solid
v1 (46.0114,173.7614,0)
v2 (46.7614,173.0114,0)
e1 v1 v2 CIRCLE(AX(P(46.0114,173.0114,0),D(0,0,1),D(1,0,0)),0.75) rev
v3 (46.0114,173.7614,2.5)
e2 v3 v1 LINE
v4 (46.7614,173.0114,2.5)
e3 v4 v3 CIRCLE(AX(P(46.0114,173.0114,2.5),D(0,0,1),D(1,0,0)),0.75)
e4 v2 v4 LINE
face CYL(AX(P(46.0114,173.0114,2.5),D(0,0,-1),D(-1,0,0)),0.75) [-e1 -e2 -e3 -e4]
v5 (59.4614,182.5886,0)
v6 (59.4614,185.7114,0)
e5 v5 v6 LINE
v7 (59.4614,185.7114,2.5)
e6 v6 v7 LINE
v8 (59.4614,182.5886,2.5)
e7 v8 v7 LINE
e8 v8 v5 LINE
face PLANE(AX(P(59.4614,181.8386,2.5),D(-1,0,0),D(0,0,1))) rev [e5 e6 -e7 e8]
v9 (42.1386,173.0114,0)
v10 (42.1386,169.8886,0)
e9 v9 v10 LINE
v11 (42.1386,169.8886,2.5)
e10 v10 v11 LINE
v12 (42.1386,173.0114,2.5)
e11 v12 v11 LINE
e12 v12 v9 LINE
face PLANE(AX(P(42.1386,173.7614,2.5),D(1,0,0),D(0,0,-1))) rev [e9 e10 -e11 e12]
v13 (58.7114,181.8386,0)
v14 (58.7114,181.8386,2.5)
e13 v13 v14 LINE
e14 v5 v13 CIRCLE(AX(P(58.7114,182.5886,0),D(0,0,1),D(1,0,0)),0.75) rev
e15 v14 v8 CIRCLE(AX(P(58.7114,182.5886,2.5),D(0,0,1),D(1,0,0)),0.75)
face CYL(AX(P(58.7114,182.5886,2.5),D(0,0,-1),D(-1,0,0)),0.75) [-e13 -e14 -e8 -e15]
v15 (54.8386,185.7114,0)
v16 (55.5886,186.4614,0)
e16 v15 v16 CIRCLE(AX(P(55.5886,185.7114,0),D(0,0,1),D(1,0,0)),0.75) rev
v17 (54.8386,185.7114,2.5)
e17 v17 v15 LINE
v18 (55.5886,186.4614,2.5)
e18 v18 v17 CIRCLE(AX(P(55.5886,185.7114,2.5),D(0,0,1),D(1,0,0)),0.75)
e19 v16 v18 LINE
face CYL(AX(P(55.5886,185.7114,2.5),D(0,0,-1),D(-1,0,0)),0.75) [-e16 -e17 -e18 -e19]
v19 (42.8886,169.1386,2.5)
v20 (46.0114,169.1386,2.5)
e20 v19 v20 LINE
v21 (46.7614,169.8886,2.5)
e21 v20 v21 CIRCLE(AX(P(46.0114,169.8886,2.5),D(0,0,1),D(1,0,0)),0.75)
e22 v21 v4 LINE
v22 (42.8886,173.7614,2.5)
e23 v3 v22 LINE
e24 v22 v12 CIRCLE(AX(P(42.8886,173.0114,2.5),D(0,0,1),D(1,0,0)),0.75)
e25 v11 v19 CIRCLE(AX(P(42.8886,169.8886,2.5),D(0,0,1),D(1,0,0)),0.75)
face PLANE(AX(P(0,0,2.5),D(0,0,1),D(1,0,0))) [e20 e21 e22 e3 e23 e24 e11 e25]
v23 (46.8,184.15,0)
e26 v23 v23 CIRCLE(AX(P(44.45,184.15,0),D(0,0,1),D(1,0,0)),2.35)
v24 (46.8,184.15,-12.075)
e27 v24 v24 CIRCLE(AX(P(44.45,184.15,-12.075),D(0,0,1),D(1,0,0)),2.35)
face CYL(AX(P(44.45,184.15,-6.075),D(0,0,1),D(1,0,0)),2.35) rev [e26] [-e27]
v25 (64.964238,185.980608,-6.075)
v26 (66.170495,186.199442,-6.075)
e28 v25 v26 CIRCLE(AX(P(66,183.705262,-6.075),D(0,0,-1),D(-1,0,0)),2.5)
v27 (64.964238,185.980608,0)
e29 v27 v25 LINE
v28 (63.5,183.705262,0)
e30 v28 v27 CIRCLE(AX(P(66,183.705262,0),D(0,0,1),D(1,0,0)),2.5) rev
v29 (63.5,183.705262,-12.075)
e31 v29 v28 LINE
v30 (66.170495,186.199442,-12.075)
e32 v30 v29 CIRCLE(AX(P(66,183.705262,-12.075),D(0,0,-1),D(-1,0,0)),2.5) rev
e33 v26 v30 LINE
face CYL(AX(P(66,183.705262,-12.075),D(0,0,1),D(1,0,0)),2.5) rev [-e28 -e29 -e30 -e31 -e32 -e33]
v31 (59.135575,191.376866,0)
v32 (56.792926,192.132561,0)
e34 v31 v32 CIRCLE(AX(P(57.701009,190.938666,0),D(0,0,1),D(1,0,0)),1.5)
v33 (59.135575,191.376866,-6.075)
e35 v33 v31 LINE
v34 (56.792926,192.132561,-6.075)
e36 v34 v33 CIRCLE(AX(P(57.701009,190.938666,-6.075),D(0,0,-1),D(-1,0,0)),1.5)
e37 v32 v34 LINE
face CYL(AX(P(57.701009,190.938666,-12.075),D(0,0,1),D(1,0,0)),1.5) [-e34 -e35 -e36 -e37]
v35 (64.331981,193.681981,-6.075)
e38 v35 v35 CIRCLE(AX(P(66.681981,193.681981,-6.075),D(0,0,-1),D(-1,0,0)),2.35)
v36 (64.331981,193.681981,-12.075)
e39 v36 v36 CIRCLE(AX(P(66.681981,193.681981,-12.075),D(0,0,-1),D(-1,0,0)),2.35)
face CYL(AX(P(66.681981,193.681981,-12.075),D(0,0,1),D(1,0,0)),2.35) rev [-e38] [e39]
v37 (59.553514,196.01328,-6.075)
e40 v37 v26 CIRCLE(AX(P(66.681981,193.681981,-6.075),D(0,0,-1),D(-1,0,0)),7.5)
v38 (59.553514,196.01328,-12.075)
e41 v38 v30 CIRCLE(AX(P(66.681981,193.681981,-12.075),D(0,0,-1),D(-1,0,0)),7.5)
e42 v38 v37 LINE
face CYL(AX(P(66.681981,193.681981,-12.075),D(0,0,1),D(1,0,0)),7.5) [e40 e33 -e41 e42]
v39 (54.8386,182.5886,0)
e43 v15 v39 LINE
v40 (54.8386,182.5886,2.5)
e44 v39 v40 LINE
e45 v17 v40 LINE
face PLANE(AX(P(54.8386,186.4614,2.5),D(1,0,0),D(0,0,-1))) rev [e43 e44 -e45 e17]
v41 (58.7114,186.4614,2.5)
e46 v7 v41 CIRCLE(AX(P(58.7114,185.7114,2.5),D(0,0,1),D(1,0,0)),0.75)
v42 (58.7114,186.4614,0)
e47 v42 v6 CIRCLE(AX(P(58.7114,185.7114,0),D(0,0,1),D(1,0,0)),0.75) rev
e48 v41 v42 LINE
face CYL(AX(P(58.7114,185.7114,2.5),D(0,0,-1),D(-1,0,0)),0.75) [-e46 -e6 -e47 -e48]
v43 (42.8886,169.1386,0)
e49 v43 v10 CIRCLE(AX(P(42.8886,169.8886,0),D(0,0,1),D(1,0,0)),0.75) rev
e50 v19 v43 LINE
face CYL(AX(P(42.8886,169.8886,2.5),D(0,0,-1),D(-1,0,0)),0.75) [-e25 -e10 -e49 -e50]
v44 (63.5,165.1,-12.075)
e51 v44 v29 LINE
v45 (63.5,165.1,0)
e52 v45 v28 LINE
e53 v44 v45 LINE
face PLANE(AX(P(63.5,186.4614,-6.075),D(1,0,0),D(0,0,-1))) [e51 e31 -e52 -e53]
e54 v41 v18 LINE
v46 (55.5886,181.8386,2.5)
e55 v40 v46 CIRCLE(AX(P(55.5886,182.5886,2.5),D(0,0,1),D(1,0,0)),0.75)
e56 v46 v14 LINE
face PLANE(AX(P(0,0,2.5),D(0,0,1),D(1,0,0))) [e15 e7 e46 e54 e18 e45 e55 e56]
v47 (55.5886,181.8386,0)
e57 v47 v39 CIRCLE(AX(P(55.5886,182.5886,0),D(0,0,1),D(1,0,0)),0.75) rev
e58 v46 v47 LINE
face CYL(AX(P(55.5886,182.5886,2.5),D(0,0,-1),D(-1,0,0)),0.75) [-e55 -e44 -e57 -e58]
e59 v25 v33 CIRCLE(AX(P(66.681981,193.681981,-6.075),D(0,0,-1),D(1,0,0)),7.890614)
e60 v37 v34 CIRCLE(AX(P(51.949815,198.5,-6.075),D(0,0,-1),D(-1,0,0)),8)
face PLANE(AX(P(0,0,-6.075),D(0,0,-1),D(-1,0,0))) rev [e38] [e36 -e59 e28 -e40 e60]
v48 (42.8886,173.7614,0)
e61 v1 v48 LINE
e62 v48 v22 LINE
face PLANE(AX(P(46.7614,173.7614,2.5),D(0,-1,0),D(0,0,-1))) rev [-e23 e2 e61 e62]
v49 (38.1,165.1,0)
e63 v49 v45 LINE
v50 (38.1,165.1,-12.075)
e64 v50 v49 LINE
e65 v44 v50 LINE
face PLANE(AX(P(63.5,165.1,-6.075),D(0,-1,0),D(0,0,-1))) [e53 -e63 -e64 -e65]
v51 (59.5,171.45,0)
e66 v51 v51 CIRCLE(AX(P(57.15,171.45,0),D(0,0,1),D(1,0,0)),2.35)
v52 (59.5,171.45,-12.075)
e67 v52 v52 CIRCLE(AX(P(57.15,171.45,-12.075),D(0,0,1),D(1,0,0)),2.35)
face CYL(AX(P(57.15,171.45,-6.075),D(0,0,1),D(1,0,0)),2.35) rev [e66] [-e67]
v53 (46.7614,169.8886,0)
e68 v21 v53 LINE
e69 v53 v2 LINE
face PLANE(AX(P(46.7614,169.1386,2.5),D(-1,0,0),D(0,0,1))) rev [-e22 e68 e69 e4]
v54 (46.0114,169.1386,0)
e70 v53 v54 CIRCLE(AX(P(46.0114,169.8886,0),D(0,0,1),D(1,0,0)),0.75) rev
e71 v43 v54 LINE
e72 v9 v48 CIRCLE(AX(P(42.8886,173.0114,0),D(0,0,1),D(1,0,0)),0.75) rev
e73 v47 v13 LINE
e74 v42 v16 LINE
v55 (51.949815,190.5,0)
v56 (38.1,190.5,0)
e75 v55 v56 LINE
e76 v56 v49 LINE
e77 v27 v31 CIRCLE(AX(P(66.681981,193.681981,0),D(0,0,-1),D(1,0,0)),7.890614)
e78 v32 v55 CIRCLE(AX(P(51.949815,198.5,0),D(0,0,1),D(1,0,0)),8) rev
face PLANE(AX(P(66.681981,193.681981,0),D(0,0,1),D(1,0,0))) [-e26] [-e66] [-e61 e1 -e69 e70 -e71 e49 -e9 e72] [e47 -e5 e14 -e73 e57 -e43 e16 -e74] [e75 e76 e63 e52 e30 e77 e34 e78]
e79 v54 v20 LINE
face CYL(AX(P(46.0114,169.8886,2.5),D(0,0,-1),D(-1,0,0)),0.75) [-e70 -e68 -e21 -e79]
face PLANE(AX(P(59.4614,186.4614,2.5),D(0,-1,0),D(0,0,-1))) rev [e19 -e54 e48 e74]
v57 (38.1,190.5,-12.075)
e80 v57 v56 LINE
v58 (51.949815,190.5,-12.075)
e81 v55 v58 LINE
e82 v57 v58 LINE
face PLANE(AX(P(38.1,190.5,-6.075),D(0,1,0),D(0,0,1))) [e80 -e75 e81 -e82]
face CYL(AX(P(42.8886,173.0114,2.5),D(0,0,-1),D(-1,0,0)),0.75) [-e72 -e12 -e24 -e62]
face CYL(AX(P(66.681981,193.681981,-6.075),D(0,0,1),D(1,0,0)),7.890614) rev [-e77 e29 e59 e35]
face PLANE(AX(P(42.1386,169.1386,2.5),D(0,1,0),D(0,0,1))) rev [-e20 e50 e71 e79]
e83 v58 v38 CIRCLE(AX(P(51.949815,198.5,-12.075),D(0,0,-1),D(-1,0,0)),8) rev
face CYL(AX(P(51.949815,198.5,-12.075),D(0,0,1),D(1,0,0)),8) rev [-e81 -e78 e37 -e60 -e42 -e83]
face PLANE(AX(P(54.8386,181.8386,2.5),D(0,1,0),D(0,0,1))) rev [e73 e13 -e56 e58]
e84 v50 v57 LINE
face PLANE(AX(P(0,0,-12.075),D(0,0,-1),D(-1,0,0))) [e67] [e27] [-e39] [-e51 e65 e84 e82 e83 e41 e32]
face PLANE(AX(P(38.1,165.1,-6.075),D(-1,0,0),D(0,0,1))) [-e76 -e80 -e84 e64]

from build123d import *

# Parameters (mm, degrees)
SKETCH2_R             = 2.35
BOSS_EXTRUDE1_DEPTH   = 2.5
BOSS_EXTRUDE1_2_DEPTH = 2.5
SKETCH2_W             = 4.6228
SKETCH2_H             = 4.6228
BOSS_EXTRUDE1_3_DEPTH = 2.5
BOSS_EXTRUDE1_4_DEPTH = 2.5
BOSS_EXTRUDE2_DEPTH   = 6.075
SKETCH6_R             = 2.35
CUT_EXTRUDE1_DEPTH    = 201.98763799
SKETCH4_R             = 7.5
SKETCH4_R_2           = 2.35
BOSS_EXTRUDE4_DEPTH   = 6
FILLET2_R             = 2.5
FILLET3_R             = 8
SKETCH7_R             = 2.35
CUT_EXTRUDE2_DEPTH    = 215.594236042
FILLET4_R             = 1.5
FILLET5_R             = 0.75


with BuildPart() as part:
    # Sketch2 → Boss-Extrude1 (new body)
    with BuildSketch(Plane.XY):
        with Locations((44.45, 184.15)):
            Circle(SKETCH2_R)
    extrude(amount=BOSS_EXTRUDE1_DEPTH)


with BuildPart() as body_2:
    # Sketch2 → Boss-Extrude1 2 (new body)
    with BuildSketch(Plane.XY):
        with Locations((57.15, 171.45)):
            Circle(SKETCH2_R)
    extrude(amount=BOSS_EXTRUDE1_2_DEPTH)


with BuildPart() as body_3:
    # Sketch2 → Boss-Extrude1 3 (new body)
    with BuildSketch(Plane.XY):
        with Locations((57.15, 184.15)):
            Rectangle(SKETCH2_W, SKETCH2_H)
    extrude(amount=BOSS_EXTRUDE1_3_DEPTH)



with BuildPart() as body_4:
    # Sketch2 → Boss-Extrude1 4 (new body)
    with BuildSketch(Plane.XY):
        with Locations((44.45, 171.45)):
            Rectangle(SKETCH2_W, SKETCH2_H)
    extrude(amount=BOSS_EXTRUDE1_4_DEPTH)


with BuildPart() as body_3_1:
    add(body_3.part)

    add(body_4.part)  # Boss-Extrude2 merges body 4
    # Sketch3 → Boss-Extrude2 (add)
    with BuildSketch(Plane.XY):
        with BuildLine():
            Line((63.5, 186.4614), (63.5, 165.1))
            Line((63.5, 165.1), (38.1, 165.1))
            Line((38.1, 165.1), (38.1, 190.5))
            Line((38.1, 190.5), (59.4614, 190.5))
            ThreePointArc((59.4614, 190.5), (61.102474131, 188.102474131), (63.5, 186.4614))
        make_face()
    extrude(amount=-BOSS_EXTRUDE2_DEPTH)


with BuildPart() as cut_extrude1_tool:
    # Sketch6 → Cut-Extrude1 (new, through all)
    with BuildSketch(Plane.XY.offset(2.5)):
        with Locations((44.45, 184.15)):
            Circle(SKETCH6_R)
        with Locations((57.15, 171.45)):
            Circle(SKETCH6_R)
    extrude(amount=-CUT_EXTRUDE1_DEPTH)


with BuildPart() as part_1:
    add(part.part)

    # Cut-Extrude1: cut by cut_extrude1_tool
    add(cut_extrude1_tool.part, mode=Mode.SUBTRACT)


with BuildPart() as body_2_1:
    add(body_2.part)

    # Cut-Extrude1: cut by cut_extrude1_tool
    add(cut_extrude1_tool.part, mode=Mode.SUBTRACT)


with BuildPart() as body_3_2:
    add(body_3_1.part)

    # Cut-Extrude1: cut by cut_extrude1_tool
    add(cut_extrude1_tool.part, mode=Mode.SUBTRACT)

    # Sketch4 → Boss-Extrude4 (add)
    # profile 1 of 3: a face of its own
    with BuildSketch(Plane(origin=(0, 0, -6.075), x_dir=(-1, 0, 0), z_dir=(0, 0, -1))):
        with Locations((-66.681980515, 193.681980515)):
            Circle(SKETCH4_R)
        with Locations((-66.681980515, 193.681980515)):
            Circle(SKETCH4_R_2, mode=Mode.SUBTRACT)
    # profile 2 of 3: a face of its own
    with BuildSketch(Plane(origin=(0, 0, -6.075), x_dir=(-1, 0, 0), z_dir=(0, 0, -1))):
        with BuildLine():
            Line((-38.1, 190.5), (-59.4614, 190.5))
            ThreePointArc((-59.4614, 190.5), (-61.102474131, 188.102474131), (-63.5, 186.4614))
            Line((-63.5, 186.4614), (-63.5, 165.1))
            Line((-63.5, 165.1), (-38.1, 165.1))
            Line((-38.1, 165.1), (-38.1, 190.5))
        make_face()
    # profile 3 of 3: a face of its own
    with BuildSketch(Plane(origin=(0, 0, -6.075), x_dir=(-1, 0, 0), z_dir=(0, 0, -1))):
        with BuildLine():
            ThreePointArc((-63.5, 186.4614), (-61.102474131, 188.102474131), (-59.4614, 190.5))
            Line((-59.4614, 190.5), (-59.890441662, 190.5))
            ThreePointArc((-59.890441662, 190.5), (-61.378679656, 188.378679656), (-63.5, 186.890441662))
            Line((-63.5, 186.890441662), (-63.5, 186.4614))
        make_face()
    extrude(amount=BOSS_EXTRUDE4_DEPTH)

    # Fillet2
    fillet2_edges = [body_3_2.edges().sort_by_distance(p)[0] for p in [
        (63.5, 186.890441662, -9.075),
    ]]
    fillet(fillet2_edges, radius=FILLET2_R)

    # Fillet3
    # the kernel refuses this fillet: 8 mm, written as the material it adds along each edge
    with BuildSketch(Plane(origin=(59.890441662, 190.5, 13.776565592), x_dir=(-1, 0, 0), z_dir=(0, 0, -1))) as fillet3_piece_1_section:
        with BuildLine():
            CenterArc((7.940626237, 8), FILLET3_R, 198.10985807, 71.89014193)
            ThreePointArc((0.336928126, 5.513280266), (0.694495171, 2.724493268), (0, 0))
            Line((0, 0), (7.940626237, 0))
        make_face()
    fillet3_piece_1 = extrude(amount=25.851565592, mode=Mode.PRIVATE)
    fillet3_piece_1 = fillet3_piece_1 - Plane(origin=(66.681980515, 193.681980515, -3.0375), x_dir=(-0.9150847933660875, -0.40326147962599274, 0), z_dir=(0, 0, 1)) * Cylinder(7.8906136, 84, mode=Mode.PRIVATE)
    fillet3_piece_1 = split(fillet3_piece_1, bisect_by=Plane(origin=(57.125105601, 191.419685935, 0), z_dir=(0, 0, -1)), keep=Keep.TOP, mode=Mode.PRIVATE)
    fillet3_piece_1 = split(fillet3_piece_1, bisect_by=Plane(origin=(57.125105601, 191.419685935, -6.075), z_dir=(0, 0, 1)), keep=Keep.TOP, mode=Mode.PRIVATE)
    add(fillet3_piece_1)
    with BuildSketch(Plane(origin=(59.890441662, 190.5, -6.075), x_dir=(-1, 0, 0), z_dir=(0, 0, -1))) as fillet3_piece_2_section:
        with BuildLine():
            CenterArc((7.940626237, 8), FILLET3_R, 198.10985807, 71.89014193)
            ThreePointArc((0.336928126, 5.513280266), (0.694495171, 2.724493268), (0, 0))
            Line((0, 0), (7.940626237, 0))
        make_face()
    fillet3_piece_2 = extrude(amount=6, mode=Mode.PRIVATE)
    fillet3_piece_2 = fillet3_piece_2 - Plane(origin=(66.681980515, 193.681980515, -9.075), x_dir=(-0.9150847933660875, -0.40326147962599274, 0), z_dir=(0, 0, 1)) * Cylinder(7.8906136, 44, mode=Mode.PRIVATE)
    add(fillet3_piece_2)
    with BuildSketch(Plane(origin=(59.890441662, 190.5, -6.075), x_dir=(-1, 0, 0), z_dir=(0, 0, -1))) as fillet3_piece_3_section:
        with BuildLine():
            CenterArc((7.940626237, 8), FILLET3_R, 198.10985807, 71.89014193)
            ThreePointArc((0.336928126, 5.513280266), (0.694495171, 2.724493268), (0, 0))
            Line((0, 0), (7.940626237, 0))
        make_face()
    fillet3_piece_3 = extrude(amount=6, mode=Mode.PRIVATE)
    fillet3_piece_3 = fillet3_piece_3 & Plane(origin=(66.681980515, 193.681980515, -9.075), x_dir=(-0.9150847933660875, -0.40326147962599274, 0), z_dir=(0, 0, 1)) * Cylinder(7.8906136, 44, mode=Mode.PRIVATE)
    add(fillet3_piece_3)

    # Sketch7 → Cut-Extrude2 (cut, through all)
    with BuildSketch(Plane.XY.offset(-6.075)):
        with Locations((44.45, 184.15)):
            Circle(SKETCH7_R)
        with Locations((57.15, 171.45)):
            Circle(SKETCH7_R)
    extrude(amount=-CUT_EXTRUDE2_DEPTH, mode=Mode.SUBTRACT)

    # Fillet4
    fillet4_edges = [body_3_2.edges().sort_by_distance(p)[0] for p in [
        (58.824977937, 194.409506089, -3.0375),
    ]]
    fillet(fillet4_edges, radius=FILLET4_R)

    # Fillet5
    fillet5_edges = [body_3_2.edges().sort_by_distance(p)[0] for p in [
        (46.7614, 173.7614, 1.25),
        (42.1386, 173.7614, 1.25),
        (42.1386, 169.1386, 1.25),
        (46.7614, 169.1386, 1.25),
        (59.4614, 181.8386, 1.25),
        (54.8386, 181.8386, 1.25),
        (54.8386, 186.4614, 1.25),
        (59.4614, 186.4614, 1.25),
    ]]
    fillet(fillet5_edges, radius=FILLET5_R)


solid = body_3_2.part
